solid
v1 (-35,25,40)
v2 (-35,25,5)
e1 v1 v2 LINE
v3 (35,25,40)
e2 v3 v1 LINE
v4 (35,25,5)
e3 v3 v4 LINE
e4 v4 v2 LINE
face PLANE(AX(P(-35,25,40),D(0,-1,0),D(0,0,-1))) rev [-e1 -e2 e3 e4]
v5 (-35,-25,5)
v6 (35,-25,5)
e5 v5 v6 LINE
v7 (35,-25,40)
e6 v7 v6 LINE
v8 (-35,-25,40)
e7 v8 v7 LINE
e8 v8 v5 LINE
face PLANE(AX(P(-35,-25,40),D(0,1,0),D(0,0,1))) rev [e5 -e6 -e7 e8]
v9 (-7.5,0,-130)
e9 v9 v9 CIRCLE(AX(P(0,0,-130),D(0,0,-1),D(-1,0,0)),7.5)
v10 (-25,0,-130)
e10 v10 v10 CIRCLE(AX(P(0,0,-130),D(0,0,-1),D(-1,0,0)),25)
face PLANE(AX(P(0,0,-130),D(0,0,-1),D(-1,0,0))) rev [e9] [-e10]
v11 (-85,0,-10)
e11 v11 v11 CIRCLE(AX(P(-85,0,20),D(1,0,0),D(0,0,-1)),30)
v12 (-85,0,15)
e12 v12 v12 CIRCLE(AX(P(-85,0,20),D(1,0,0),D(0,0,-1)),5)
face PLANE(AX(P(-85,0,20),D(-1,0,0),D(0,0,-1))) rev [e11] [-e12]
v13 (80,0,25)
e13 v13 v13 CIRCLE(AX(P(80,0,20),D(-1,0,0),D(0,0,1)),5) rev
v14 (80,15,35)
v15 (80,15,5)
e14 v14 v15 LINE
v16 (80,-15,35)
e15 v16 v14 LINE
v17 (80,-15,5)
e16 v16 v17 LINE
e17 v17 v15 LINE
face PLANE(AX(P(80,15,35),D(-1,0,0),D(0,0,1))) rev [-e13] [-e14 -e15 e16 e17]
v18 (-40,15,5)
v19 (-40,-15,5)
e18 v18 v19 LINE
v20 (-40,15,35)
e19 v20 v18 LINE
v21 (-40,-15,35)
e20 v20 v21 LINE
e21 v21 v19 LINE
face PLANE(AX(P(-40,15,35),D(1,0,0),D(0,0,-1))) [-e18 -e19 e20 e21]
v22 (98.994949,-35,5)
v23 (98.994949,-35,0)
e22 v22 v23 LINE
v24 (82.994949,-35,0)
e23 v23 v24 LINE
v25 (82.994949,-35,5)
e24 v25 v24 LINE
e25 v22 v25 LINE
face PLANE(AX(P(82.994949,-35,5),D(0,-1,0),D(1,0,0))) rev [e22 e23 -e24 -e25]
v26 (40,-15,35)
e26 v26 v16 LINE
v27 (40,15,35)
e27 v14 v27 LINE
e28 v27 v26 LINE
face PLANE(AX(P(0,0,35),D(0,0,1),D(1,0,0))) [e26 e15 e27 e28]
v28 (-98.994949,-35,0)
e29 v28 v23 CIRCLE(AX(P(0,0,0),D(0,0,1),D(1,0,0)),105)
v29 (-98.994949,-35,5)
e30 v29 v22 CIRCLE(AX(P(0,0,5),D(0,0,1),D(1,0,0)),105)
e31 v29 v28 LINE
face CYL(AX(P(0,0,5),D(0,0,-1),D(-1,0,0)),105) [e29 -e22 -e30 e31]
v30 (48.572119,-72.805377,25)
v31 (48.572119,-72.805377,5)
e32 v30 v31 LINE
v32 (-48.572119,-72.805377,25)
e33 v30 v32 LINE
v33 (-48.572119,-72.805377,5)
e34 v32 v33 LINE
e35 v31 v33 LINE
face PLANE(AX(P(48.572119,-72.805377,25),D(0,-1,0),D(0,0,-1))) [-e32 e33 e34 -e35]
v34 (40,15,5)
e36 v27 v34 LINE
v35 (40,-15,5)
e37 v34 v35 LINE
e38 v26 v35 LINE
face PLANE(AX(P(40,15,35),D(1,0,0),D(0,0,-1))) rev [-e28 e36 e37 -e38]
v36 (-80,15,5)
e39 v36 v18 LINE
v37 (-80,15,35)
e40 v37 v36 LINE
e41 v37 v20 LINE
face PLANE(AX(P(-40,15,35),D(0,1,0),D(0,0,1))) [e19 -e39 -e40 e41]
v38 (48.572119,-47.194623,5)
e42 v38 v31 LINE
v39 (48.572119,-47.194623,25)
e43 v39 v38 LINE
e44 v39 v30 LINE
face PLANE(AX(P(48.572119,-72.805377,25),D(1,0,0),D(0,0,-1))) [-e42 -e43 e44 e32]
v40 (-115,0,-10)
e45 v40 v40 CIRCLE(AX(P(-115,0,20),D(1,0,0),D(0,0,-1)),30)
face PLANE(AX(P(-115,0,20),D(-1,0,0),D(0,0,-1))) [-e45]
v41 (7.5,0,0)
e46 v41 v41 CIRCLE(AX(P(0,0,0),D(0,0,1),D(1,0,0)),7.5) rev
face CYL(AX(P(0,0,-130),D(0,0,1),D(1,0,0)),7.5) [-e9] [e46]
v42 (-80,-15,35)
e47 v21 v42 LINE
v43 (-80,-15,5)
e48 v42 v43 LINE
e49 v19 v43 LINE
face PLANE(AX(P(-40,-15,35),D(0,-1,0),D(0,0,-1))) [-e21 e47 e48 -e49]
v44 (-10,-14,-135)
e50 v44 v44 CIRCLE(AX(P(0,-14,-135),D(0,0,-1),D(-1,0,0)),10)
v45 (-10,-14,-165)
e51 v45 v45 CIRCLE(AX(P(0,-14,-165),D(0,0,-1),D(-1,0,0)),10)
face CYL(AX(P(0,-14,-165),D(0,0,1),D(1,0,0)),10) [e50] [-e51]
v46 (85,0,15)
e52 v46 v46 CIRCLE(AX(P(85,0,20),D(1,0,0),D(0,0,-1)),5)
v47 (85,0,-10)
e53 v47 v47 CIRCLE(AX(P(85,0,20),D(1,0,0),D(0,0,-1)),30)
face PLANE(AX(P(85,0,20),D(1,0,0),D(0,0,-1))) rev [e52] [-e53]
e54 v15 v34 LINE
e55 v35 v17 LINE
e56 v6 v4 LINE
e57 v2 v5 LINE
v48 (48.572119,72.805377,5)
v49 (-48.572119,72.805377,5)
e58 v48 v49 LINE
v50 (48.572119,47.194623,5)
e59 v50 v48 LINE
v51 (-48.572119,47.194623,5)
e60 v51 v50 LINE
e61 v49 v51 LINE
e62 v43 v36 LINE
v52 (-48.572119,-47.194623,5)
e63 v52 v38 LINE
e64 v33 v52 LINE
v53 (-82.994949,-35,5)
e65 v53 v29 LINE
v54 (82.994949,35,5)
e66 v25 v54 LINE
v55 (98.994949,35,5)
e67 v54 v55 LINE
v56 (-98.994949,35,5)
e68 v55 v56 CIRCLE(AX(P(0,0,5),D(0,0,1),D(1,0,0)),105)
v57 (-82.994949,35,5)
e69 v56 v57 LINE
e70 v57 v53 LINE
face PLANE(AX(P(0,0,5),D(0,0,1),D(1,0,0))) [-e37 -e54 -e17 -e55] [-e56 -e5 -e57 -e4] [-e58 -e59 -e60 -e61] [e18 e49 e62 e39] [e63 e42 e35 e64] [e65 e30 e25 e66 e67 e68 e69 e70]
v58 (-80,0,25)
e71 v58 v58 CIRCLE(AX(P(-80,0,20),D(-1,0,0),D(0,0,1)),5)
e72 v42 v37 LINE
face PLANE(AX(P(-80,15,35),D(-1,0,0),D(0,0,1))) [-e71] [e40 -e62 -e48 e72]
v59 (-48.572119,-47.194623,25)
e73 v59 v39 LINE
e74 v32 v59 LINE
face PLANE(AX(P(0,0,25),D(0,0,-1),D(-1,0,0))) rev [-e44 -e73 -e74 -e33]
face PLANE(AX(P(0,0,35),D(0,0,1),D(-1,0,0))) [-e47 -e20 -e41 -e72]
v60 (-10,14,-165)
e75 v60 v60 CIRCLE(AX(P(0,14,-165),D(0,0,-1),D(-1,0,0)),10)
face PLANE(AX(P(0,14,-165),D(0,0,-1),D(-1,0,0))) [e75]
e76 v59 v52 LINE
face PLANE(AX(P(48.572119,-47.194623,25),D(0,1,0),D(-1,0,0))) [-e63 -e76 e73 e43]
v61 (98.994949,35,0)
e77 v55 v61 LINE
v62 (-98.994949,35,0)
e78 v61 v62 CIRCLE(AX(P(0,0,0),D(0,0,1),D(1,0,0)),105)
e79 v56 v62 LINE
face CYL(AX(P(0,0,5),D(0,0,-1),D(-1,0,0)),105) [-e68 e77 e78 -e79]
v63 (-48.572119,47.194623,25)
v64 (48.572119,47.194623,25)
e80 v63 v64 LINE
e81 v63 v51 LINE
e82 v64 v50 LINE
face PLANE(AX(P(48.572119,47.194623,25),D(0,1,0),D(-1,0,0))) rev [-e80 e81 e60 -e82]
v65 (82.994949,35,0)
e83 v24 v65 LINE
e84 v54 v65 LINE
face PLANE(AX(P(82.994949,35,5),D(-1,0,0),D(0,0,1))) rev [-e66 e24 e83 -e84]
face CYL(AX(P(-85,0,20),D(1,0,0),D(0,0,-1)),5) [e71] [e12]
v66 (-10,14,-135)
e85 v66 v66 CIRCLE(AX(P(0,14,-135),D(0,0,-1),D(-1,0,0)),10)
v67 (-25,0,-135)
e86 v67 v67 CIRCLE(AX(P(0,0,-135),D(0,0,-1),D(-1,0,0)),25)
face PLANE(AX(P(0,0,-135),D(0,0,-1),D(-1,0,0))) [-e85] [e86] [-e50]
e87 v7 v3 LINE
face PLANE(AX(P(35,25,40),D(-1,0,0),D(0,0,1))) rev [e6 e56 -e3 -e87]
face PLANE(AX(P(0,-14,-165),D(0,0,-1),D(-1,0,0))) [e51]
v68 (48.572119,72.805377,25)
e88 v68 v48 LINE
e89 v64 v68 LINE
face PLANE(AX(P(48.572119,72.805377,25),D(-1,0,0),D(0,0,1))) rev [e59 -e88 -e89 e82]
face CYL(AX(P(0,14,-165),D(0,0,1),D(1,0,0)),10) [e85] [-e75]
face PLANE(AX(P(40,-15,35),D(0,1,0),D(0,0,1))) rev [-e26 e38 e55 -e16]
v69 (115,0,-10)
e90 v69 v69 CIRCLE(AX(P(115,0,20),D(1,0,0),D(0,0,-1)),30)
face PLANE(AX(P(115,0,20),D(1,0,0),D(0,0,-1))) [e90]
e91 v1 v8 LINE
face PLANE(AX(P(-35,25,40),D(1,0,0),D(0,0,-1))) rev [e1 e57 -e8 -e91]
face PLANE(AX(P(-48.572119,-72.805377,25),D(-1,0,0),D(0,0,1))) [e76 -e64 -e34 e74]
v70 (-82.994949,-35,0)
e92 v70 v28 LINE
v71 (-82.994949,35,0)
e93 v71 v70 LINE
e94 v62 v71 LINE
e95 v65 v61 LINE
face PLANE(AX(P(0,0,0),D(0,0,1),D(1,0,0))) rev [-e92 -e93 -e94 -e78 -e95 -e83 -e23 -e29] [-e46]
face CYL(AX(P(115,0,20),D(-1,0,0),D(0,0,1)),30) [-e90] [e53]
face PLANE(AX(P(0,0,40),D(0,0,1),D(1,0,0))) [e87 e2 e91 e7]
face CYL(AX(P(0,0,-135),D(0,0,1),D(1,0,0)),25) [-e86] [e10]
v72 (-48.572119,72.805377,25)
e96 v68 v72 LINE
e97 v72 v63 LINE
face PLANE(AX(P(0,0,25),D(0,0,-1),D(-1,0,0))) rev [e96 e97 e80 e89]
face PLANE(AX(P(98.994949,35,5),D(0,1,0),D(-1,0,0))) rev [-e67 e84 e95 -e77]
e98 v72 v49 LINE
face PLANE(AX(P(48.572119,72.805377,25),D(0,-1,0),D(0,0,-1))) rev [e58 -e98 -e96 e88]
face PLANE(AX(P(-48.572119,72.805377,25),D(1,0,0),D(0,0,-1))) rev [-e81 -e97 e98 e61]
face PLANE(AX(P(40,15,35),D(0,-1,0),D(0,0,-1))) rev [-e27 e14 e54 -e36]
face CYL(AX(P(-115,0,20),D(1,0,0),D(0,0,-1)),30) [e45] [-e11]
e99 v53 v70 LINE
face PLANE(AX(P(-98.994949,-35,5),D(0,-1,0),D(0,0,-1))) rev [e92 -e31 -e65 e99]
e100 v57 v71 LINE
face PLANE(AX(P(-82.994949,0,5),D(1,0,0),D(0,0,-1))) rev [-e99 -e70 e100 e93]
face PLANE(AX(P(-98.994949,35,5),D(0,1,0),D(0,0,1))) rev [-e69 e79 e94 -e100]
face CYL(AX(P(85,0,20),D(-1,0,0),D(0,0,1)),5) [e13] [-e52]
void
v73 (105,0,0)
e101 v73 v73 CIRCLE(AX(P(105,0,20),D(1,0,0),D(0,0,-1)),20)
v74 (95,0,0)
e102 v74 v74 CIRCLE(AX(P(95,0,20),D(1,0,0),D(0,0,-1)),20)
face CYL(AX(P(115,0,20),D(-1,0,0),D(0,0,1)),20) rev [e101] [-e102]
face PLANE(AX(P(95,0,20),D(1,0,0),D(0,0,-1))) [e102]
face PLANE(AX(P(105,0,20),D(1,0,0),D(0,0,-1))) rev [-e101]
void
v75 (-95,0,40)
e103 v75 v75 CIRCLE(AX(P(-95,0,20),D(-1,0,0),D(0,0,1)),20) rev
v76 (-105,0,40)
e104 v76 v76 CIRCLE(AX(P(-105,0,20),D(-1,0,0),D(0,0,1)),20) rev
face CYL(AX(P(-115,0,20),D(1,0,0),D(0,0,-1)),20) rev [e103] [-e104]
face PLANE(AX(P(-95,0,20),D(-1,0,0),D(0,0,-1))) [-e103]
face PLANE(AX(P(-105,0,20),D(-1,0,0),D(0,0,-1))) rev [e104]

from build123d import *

# Parameters (mm, degrees)
BOSS_EXTRUDE1_DEPTH = 5
SKETCH2_W           = 70
SKETCH2_H           = 50
BOSS_EXTRUDE2_DEPTH = 35
SKETCH3_W           = 40
SKETCH3_H           = 30
BOSS_EXTRUDE3_DEPTH = 30
SKETCH4_R           = 5
BOSS_EXTRUDE4_DEPTH = 5
SKETCH5_R           = 30
BOSS_EXTRUDE5_DEPTH = 30
SKETCH6_R           = 7.5
BOSS_EXTRUDE6_DEPTH = 130
SKETCH7_R           = 25
BOSS_EXTRUDE7_DEPTH = 5
SKETCH9_R           = 10
BOSS_EXTRUDE8_DEPTH = 30
SKETCH10_W          = 97.144237238
SKETCH10_H          = 25.610753454
BOSS_EXTRUDE9_DEPTH = 20
SHELL1_START        = -105
SHELL1_OUTLINE_R    = 20
SHELL1_DEPTH        = 10
SHELL1_START_2      = 95
SHELL1_2_OUTLINE_R  = 20
SHELL1_2_DEPTH      = 10


# Read off the part's stored shape, not the designer's step: Shell1
with BuildPart() as part:
    # Sketch1 → Boss-Extrude1 (new body)
    with BuildSketch(Plane.XY):
        with BuildLine():
            Line((-98.994949366, 35), (-82.994949366, 35))
            Line((-82.994949366, 35), (-82.994949366, 0))
            Line((-82.994949366, 0), (-82.994949366, -35))
            Line((-82.994949366, -35), (-98.994949366, -35))
            ThreePointArc((-98.994949366, -35), (0, -105), (98.994949366, -35))
            Line((98.994949366, -35), (82.994949366, -35))
            Line((82.994949366, -35), (82.994949366, 0))
            Line((82.994949366, 0), (82.994949366, 35))
            Line((82.994949366, 35), (98.994949366, 35))
            ThreePointArc((98.994949366, 35), (0, 105), (-98.994949366, 35))
        make_face()
    extrude(amount=BOSS_EXTRUDE1_DEPTH)

    # Sketch2 → Boss-Extrude2 (add)
    with BuildSketch(Plane.XY.offset(5)):
        Rectangle(SKETCH2_W, SKETCH2_H)
    extrude(amount=BOSS_EXTRUDE2_DEPTH)

    # Sketch3 → Boss-Extrude3 (add)
    with BuildSketch(Plane.XY.offset(5)):
        with Locations((60, 0)):
            Rectangle(SKETCH3_W, SKETCH3_H)
    boss_extrude3 = extrude(amount=BOSS_EXTRUDE3_DEPTH)

    # Sketch4 → Boss-Extrude4 (add)
    with BuildSketch(Plane(origin=(80, 0, 0), x_dir=(0, 0, -1), z_dir=(1, 0, 0))):
        with Locations(Location((-20, 0, 0), (0, 0, 180))):
            Circle(SKETCH4_R)
    boss_extrude4 = extrude(amount=BOSS_EXTRUDE4_DEPTH)

    # Sketch5 → Boss-Extrude5 (add)
    with BuildSketch(Plane(origin=(85, 0, 0), x_dir=(0, 0, -1), z_dir=(1, 0, 0))):
        with Locations((-20, 0)):
            Circle(SKETCH5_R)
    boss_extrude5 = extrude(amount=BOSS_EXTRUDE5_DEPTH)

    # Mirror1: Boss-Extrude3, Boss-Extrude4, Boss-Extrude5 across plane
    add(boss_extrude3.mirror(Plane(origin=(0, 0, 0), x_dir=(0, 0, 1), z_dir=(1, 0, 0))))
    add(boss_extrude4.mirror(Plane(origin=(0, 0, 0), x_dir=(0, 0, 1), z_dir=(1, 0, 0))))
    add(boss_extrude5.mirror(Plane(origin=(0, 0, 0), x_dir=(0, 0, 1), z_dir=(1, 0, 0))))

    # Sketch6 → Boss-Extrude6 (add)
    with BuildSketch(Plane(origin=(0, 0, 0), x_dir=(-1, 0, 0), z_dir=(0, 0, -1))):
        with Locations(Location((0, 0, 0), (0, 0, 180))):
            Circle(SKETCH6_R)
    extrude(amount=BOSS_EXTRUDE6_DEPTH)

    # Sketch7 → Boss-Extrude7 (add)
    with BuildSketch(Plane(origin=(0, 0, -130), x_dir=(-1, 0, 0), z_dir=(0, 0, -1))):
        Circle(SKETCH7_R)
    extrude(amount=BOSS_EXTRUDE7_DEPTH)

    # Sketch9 → Boss-Extrude8 (add)
    with BuildSketch(Plane(origin=(0, 0, -135), x_dir=(-1, 0, 0), z_dir=(0, 0, -1))):
        with Locations((0, 14)):
            Circle(SKETCH9_R)
        with Locations((0, -14)):
            Circle(SKETCH9_R)
    extrude(amount=BOSS_EXTRUDE8_DEPTH)

    # Sketch10 → Boss-Extrude9 (add)
    with BuildSketch(Plane.XY.offset(5)):
        with Locations((0, 60)):
            Rectangle(SKETCH10_W, SKETCH10_H)
    boss_extrude9 = extrude(amount=BOSS_EXTRUDE9_DEPTH)

    # Mirror2: Boss-Extrude9 across plane
    add(boss_extrude9.mirror(Plane.ZX))

    # Shell1 outline → Shell1 (cut)
    with BuildSketch(Plane.YZ.offset(SHELL1_START)):
        with Locations((0, 20)):
            Circle(SHELL1_OUTLINE_R)
    extrude(amount=SHELL1_DEPTH, mode=Mode.SUBTRACT)

    # Shell1 2 outline → Shell1 2 (cut)
    with BuildSketch(Plane.YZ.offset(SHELL1_START_2)):
        with Locations((0, 20)):
            Circle(SHELL1_2_OUTLINE_R)
    extrude(amount=SHELL1_2_DEPTH, mode=Mode.SUBTRACT)


solid = part.part
